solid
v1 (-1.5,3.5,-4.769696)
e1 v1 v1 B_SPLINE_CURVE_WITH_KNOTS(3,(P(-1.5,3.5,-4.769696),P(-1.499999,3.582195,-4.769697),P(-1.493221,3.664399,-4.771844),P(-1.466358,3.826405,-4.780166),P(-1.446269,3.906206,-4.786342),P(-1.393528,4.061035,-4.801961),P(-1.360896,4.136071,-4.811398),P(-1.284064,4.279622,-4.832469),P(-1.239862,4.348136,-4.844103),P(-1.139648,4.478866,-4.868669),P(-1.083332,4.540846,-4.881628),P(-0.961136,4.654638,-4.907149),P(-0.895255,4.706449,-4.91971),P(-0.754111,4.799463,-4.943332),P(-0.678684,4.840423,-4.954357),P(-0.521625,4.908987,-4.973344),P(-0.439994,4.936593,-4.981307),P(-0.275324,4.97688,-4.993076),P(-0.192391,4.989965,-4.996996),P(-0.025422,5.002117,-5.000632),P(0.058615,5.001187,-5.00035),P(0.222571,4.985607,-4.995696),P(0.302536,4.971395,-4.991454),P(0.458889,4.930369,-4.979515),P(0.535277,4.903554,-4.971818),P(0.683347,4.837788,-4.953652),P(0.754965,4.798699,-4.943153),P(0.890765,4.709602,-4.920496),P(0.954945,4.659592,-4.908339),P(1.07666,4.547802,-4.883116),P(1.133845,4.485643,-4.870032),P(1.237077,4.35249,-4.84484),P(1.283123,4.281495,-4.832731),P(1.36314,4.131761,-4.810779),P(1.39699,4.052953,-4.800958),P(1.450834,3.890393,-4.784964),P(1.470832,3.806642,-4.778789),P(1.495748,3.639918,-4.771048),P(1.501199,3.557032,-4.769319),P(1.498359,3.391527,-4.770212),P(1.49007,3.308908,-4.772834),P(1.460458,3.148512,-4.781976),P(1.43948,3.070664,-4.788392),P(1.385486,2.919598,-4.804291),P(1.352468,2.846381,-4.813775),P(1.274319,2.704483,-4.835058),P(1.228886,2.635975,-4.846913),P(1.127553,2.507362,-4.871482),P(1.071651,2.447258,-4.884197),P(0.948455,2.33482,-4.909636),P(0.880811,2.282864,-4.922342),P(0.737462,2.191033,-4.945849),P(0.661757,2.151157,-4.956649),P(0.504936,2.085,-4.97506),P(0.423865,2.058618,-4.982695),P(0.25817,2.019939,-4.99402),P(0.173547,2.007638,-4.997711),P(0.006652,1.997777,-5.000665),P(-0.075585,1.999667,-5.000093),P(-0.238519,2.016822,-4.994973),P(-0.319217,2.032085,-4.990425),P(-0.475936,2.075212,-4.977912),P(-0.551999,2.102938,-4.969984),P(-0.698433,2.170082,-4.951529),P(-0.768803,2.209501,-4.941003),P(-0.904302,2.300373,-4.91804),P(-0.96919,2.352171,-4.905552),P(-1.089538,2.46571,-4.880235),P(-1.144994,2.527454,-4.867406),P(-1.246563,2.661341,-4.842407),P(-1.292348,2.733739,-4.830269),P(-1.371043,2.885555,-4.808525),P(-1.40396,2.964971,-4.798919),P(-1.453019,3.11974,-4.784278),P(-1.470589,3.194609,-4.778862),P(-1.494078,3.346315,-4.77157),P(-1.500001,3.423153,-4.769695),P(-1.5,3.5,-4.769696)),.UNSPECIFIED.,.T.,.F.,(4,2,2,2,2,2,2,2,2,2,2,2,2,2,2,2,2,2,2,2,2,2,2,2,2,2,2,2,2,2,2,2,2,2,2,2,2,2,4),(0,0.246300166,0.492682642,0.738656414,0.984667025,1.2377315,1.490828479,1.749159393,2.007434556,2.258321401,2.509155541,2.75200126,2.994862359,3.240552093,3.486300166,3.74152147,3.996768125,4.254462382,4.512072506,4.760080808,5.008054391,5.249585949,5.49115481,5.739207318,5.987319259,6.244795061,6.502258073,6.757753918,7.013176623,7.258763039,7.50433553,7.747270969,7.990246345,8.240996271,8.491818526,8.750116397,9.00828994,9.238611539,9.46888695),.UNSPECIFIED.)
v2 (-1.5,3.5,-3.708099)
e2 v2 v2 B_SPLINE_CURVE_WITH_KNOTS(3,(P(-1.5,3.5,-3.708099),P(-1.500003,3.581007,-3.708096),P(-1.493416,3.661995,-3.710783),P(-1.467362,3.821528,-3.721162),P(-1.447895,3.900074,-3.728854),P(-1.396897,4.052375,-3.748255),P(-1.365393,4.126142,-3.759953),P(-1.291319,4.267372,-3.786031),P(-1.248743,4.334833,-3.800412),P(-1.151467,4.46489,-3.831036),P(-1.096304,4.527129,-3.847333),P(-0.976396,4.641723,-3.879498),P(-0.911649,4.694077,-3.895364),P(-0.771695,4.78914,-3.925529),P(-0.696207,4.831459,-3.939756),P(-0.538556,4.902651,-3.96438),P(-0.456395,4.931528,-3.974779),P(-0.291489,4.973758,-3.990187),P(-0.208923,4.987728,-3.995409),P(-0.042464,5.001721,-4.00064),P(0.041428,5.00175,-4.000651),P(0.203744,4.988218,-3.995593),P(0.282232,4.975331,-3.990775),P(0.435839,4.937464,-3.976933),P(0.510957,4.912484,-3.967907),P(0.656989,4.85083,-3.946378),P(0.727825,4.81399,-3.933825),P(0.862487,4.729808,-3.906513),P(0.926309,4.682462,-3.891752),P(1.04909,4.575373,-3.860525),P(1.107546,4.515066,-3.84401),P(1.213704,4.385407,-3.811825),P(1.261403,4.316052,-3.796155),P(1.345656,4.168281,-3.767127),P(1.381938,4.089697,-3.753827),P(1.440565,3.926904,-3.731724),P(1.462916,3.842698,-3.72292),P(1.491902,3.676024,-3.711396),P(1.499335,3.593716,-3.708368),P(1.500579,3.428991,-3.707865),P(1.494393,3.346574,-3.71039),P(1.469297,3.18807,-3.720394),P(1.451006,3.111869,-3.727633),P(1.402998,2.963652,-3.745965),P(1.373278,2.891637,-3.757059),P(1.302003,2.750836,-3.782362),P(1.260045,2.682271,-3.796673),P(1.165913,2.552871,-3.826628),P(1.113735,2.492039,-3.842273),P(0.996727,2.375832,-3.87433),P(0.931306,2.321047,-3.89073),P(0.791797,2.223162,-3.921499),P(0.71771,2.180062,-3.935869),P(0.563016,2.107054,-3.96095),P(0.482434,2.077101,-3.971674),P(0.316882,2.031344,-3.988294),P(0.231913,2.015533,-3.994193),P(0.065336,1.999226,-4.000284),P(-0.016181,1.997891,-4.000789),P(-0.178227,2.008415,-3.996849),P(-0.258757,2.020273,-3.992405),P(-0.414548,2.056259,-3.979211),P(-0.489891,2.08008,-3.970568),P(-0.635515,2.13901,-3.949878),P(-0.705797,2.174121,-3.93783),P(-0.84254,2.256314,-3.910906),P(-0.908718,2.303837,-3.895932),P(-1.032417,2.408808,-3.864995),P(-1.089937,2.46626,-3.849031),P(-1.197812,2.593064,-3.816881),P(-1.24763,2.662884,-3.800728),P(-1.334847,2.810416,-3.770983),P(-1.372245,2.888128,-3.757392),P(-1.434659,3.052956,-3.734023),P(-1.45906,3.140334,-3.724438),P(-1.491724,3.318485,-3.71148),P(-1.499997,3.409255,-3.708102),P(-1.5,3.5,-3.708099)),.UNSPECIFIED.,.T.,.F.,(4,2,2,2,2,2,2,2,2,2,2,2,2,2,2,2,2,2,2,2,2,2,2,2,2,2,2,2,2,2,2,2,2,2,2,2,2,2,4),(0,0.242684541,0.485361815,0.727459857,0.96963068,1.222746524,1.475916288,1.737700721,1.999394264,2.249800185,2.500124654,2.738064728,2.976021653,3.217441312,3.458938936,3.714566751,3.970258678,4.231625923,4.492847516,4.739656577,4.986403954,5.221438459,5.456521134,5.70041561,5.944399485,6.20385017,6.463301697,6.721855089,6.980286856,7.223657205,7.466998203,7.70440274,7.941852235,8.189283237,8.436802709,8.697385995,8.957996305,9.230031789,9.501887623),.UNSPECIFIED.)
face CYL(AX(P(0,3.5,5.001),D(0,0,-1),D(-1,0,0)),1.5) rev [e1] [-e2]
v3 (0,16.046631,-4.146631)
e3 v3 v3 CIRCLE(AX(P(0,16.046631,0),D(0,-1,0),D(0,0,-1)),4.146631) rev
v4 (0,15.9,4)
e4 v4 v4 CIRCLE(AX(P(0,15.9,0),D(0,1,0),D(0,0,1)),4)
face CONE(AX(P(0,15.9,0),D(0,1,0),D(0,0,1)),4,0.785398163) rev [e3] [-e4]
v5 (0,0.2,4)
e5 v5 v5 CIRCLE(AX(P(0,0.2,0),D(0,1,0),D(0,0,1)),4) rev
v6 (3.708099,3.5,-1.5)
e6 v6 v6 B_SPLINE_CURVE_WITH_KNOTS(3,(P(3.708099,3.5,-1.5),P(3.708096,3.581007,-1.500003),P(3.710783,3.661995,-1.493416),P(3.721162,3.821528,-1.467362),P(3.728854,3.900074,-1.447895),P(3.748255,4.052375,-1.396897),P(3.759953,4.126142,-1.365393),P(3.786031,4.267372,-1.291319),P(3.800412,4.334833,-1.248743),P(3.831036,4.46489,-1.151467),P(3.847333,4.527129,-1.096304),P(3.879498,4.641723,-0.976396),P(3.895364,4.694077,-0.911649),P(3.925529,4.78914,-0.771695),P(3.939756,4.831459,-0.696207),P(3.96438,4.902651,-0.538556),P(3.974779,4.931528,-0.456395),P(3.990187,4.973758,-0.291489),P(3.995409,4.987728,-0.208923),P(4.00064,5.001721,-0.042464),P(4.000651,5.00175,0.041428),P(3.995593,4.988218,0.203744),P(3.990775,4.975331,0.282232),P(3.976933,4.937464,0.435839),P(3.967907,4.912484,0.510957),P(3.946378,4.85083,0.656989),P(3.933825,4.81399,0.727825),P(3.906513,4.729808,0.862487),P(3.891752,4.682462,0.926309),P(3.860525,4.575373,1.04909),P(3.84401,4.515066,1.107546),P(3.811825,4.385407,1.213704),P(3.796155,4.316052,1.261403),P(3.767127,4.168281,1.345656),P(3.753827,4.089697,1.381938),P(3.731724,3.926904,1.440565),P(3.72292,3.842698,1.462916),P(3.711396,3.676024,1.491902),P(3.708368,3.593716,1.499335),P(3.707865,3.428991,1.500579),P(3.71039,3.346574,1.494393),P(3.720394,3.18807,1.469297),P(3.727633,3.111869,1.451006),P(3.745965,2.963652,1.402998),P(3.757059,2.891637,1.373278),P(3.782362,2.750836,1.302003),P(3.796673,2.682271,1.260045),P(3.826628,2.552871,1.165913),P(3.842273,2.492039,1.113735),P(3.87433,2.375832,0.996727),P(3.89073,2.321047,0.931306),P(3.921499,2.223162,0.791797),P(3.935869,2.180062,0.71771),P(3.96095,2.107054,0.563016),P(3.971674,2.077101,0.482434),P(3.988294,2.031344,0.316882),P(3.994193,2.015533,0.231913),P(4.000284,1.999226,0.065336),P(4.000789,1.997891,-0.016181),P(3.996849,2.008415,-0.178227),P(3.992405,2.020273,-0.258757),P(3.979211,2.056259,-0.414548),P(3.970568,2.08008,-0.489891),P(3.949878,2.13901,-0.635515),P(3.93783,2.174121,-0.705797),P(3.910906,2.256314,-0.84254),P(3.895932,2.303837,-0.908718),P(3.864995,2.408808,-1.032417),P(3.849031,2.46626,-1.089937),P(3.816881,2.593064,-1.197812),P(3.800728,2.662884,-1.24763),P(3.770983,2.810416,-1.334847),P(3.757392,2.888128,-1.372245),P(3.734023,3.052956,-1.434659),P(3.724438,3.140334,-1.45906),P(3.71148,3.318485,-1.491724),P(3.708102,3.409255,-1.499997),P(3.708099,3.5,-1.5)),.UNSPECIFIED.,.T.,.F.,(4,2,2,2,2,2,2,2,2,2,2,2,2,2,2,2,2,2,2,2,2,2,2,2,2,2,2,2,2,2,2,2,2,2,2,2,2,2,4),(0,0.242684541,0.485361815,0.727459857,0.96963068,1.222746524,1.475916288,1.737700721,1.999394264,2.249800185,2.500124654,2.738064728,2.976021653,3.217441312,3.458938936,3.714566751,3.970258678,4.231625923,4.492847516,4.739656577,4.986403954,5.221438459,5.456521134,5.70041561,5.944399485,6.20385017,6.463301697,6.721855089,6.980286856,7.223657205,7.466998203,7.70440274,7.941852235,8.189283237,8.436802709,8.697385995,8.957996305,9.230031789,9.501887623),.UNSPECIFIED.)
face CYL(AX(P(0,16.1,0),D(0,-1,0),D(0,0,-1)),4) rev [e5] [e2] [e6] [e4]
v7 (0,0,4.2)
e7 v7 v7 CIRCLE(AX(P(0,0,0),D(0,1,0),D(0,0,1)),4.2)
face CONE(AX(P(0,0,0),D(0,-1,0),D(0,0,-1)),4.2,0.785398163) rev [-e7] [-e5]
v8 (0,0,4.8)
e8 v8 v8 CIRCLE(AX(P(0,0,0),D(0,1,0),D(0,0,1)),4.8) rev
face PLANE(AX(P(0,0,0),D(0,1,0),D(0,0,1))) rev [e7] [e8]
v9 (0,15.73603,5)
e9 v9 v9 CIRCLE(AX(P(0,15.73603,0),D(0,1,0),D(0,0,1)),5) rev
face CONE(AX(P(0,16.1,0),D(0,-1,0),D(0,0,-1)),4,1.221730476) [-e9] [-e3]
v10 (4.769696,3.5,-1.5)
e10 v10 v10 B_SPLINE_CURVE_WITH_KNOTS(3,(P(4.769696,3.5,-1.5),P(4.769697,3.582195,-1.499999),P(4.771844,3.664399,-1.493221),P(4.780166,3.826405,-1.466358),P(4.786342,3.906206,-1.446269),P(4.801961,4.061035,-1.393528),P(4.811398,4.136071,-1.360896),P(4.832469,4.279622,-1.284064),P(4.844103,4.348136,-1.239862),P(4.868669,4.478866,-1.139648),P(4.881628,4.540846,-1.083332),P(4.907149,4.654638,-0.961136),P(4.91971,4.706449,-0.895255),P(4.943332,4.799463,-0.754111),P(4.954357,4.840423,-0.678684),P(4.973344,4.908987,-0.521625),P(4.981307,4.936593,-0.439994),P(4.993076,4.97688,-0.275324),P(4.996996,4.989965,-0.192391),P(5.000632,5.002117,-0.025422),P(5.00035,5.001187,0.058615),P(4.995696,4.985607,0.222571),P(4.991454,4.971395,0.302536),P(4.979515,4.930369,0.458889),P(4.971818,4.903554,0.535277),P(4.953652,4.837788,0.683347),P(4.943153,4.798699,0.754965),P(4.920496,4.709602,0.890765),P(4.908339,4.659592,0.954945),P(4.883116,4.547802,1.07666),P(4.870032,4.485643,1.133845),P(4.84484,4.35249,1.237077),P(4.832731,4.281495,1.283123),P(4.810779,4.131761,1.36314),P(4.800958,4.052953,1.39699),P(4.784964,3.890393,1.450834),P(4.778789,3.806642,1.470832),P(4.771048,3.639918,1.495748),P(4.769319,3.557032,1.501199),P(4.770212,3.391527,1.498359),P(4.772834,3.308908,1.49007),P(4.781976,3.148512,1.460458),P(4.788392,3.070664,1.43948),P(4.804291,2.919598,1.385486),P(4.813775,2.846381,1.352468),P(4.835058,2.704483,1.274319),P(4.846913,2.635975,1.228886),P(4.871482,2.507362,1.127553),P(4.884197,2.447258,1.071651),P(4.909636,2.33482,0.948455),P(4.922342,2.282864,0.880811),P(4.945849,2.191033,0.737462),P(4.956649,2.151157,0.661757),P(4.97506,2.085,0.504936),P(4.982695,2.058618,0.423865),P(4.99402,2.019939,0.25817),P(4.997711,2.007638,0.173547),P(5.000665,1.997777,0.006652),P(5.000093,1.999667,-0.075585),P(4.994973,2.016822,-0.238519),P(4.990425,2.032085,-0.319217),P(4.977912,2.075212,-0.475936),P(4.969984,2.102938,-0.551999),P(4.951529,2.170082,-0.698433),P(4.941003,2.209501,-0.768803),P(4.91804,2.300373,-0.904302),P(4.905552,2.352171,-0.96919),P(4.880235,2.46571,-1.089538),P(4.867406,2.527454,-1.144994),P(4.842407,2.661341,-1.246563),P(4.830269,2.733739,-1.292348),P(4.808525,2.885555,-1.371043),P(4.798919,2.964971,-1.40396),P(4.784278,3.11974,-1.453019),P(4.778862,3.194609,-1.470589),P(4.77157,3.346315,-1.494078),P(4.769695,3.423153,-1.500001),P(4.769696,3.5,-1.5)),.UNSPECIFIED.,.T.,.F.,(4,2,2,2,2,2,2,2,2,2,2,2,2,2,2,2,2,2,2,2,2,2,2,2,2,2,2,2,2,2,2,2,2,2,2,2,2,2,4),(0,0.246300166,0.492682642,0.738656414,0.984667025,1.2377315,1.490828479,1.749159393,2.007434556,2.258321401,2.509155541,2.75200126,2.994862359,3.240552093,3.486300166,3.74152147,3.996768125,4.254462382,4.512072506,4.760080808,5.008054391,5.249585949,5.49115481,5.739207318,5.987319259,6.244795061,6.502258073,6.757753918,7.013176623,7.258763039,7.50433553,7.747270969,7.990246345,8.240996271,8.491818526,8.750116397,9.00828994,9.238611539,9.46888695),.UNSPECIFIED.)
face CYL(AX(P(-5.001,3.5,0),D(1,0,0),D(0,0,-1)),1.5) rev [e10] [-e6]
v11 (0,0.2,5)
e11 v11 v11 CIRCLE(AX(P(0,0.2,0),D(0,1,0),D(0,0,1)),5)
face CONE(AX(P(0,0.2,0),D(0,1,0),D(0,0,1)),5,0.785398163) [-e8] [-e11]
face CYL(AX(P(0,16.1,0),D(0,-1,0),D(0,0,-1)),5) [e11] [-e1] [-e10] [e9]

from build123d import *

# Parameters (mm, degrees)
SKETCH1_R               = 5
SKETCH1_R_2             = 4
BOSS_EXTRUDE1_DEPTH     = 16.1
CHAMFER1_SIZE           = 0.2
CHAMFER2_SIZE           = 0.363970234
CHAMFER2_SIZE_2         = 1
CUT_EXTRUDE1_REACH      = 21.557
CUT_EXTRUDE1_END_RADIUS = 4
SKETCH2_R               = 1.5
CIRPATTERN1_COUNT       = 2
CIRPATTERN1_ANGLE       = 90


with BuildPart() as part:
    # Sketch1 → Boss-Extrude1 (new body)
    with BuildSketch(Plane(origin=(0, 0, 0), x_dir=(1, 0, 0), z_dir=(0, 1, 0))):
        with Locations(Location((0, 0, 0), (0, 0, 270))):
            Circle(SKETCH1_R)
        with Locations(Location((0, 0, 0), (0, 0, 270))):
            Circle(SKETCH1_R_2, mode=Mode.SUBTRACT)
    extrude(amount=BOSS_EXTRUDE1_DEPTH)

    # Chamfer1
    chamfer1_edges = [part.edges().sort_by_distance(p)[0] for p in [
        (0, 0, -5),
        (0, 0, -4),
        (0, 16.1, -4),
    ]]
    chamfer(chamfer1_edges, length=CHAMFER1_SIZE)

    # Chamfer2
    # the kernel refuses this chamfer: 1, 0.363970234 mm, written as the material it takes off along each edge
    with BuildSketch(Plane(origin=(0, 16.1, 0), x_dir=(0, 0, 1), z_dir=(-1, 0, 0))) as chamfer2_piece_1:
        Polygon((5, -CHAMFER2_SIZE), (5 - CHAMFER2_SIZE_2, 0), (5, 0), align=None)
    revolve(axis=Axis((0, 16.1, 0), (0, 1, 0)), mode=Mode.SUBTRACT)

    # Cut-Extrude1: up to this cylinder (the profile starts outside it)
    cut_extrude1_end = Plane(origin=(0, 3.5, 0), z_dir=(0, -1, 0)) * Cylinder(CUT_EXTRUDE1_END_RADIUS, 52.114, mode=Mode.PRIVATE)
    # Sketch2 → Cut-Extrude1 (cut, up to the surface)
    with BuildSketch(Plane(origin=(0, 0, -5), x_dir=(-1, 0, 0), z_dir=(0, 0, -1)), mode=Mode.PRIVATE) as cut_extrude1_sk1:
        with Locations((0, 3.5)):
            Circle(SKETCH2_R)
    cut_extrude1_tool1 = extrude(cut_extrude1_sk1.sketch, amount=-CUT_EXTRUDE1_REACH, mode=Mode.PRIVATE) - cut_extrude1_end
    cut_extrude1 = cut_extrude1_tool1.solids().sort_by_distance((0, 3.5, -5))[0]
    add(cut_extrude1, mode=Mode.SUBTRACT)

    # CirPattern1: Cut-Extrude1 ×2 about axis
    cirpattern1_axis = Axis((0, 15.9, 0), (0, -1, 0))
    for i in range(1, CIRPATTERN1_COUNT):
        add(cut_extrude1.rotate(cirpattern1_axis, i * CIRPATTERN1_ANGLE / (CIRPATTERN1_COUNT - 1)), mode=Mode.SUBTRACT)


solid = part.part
